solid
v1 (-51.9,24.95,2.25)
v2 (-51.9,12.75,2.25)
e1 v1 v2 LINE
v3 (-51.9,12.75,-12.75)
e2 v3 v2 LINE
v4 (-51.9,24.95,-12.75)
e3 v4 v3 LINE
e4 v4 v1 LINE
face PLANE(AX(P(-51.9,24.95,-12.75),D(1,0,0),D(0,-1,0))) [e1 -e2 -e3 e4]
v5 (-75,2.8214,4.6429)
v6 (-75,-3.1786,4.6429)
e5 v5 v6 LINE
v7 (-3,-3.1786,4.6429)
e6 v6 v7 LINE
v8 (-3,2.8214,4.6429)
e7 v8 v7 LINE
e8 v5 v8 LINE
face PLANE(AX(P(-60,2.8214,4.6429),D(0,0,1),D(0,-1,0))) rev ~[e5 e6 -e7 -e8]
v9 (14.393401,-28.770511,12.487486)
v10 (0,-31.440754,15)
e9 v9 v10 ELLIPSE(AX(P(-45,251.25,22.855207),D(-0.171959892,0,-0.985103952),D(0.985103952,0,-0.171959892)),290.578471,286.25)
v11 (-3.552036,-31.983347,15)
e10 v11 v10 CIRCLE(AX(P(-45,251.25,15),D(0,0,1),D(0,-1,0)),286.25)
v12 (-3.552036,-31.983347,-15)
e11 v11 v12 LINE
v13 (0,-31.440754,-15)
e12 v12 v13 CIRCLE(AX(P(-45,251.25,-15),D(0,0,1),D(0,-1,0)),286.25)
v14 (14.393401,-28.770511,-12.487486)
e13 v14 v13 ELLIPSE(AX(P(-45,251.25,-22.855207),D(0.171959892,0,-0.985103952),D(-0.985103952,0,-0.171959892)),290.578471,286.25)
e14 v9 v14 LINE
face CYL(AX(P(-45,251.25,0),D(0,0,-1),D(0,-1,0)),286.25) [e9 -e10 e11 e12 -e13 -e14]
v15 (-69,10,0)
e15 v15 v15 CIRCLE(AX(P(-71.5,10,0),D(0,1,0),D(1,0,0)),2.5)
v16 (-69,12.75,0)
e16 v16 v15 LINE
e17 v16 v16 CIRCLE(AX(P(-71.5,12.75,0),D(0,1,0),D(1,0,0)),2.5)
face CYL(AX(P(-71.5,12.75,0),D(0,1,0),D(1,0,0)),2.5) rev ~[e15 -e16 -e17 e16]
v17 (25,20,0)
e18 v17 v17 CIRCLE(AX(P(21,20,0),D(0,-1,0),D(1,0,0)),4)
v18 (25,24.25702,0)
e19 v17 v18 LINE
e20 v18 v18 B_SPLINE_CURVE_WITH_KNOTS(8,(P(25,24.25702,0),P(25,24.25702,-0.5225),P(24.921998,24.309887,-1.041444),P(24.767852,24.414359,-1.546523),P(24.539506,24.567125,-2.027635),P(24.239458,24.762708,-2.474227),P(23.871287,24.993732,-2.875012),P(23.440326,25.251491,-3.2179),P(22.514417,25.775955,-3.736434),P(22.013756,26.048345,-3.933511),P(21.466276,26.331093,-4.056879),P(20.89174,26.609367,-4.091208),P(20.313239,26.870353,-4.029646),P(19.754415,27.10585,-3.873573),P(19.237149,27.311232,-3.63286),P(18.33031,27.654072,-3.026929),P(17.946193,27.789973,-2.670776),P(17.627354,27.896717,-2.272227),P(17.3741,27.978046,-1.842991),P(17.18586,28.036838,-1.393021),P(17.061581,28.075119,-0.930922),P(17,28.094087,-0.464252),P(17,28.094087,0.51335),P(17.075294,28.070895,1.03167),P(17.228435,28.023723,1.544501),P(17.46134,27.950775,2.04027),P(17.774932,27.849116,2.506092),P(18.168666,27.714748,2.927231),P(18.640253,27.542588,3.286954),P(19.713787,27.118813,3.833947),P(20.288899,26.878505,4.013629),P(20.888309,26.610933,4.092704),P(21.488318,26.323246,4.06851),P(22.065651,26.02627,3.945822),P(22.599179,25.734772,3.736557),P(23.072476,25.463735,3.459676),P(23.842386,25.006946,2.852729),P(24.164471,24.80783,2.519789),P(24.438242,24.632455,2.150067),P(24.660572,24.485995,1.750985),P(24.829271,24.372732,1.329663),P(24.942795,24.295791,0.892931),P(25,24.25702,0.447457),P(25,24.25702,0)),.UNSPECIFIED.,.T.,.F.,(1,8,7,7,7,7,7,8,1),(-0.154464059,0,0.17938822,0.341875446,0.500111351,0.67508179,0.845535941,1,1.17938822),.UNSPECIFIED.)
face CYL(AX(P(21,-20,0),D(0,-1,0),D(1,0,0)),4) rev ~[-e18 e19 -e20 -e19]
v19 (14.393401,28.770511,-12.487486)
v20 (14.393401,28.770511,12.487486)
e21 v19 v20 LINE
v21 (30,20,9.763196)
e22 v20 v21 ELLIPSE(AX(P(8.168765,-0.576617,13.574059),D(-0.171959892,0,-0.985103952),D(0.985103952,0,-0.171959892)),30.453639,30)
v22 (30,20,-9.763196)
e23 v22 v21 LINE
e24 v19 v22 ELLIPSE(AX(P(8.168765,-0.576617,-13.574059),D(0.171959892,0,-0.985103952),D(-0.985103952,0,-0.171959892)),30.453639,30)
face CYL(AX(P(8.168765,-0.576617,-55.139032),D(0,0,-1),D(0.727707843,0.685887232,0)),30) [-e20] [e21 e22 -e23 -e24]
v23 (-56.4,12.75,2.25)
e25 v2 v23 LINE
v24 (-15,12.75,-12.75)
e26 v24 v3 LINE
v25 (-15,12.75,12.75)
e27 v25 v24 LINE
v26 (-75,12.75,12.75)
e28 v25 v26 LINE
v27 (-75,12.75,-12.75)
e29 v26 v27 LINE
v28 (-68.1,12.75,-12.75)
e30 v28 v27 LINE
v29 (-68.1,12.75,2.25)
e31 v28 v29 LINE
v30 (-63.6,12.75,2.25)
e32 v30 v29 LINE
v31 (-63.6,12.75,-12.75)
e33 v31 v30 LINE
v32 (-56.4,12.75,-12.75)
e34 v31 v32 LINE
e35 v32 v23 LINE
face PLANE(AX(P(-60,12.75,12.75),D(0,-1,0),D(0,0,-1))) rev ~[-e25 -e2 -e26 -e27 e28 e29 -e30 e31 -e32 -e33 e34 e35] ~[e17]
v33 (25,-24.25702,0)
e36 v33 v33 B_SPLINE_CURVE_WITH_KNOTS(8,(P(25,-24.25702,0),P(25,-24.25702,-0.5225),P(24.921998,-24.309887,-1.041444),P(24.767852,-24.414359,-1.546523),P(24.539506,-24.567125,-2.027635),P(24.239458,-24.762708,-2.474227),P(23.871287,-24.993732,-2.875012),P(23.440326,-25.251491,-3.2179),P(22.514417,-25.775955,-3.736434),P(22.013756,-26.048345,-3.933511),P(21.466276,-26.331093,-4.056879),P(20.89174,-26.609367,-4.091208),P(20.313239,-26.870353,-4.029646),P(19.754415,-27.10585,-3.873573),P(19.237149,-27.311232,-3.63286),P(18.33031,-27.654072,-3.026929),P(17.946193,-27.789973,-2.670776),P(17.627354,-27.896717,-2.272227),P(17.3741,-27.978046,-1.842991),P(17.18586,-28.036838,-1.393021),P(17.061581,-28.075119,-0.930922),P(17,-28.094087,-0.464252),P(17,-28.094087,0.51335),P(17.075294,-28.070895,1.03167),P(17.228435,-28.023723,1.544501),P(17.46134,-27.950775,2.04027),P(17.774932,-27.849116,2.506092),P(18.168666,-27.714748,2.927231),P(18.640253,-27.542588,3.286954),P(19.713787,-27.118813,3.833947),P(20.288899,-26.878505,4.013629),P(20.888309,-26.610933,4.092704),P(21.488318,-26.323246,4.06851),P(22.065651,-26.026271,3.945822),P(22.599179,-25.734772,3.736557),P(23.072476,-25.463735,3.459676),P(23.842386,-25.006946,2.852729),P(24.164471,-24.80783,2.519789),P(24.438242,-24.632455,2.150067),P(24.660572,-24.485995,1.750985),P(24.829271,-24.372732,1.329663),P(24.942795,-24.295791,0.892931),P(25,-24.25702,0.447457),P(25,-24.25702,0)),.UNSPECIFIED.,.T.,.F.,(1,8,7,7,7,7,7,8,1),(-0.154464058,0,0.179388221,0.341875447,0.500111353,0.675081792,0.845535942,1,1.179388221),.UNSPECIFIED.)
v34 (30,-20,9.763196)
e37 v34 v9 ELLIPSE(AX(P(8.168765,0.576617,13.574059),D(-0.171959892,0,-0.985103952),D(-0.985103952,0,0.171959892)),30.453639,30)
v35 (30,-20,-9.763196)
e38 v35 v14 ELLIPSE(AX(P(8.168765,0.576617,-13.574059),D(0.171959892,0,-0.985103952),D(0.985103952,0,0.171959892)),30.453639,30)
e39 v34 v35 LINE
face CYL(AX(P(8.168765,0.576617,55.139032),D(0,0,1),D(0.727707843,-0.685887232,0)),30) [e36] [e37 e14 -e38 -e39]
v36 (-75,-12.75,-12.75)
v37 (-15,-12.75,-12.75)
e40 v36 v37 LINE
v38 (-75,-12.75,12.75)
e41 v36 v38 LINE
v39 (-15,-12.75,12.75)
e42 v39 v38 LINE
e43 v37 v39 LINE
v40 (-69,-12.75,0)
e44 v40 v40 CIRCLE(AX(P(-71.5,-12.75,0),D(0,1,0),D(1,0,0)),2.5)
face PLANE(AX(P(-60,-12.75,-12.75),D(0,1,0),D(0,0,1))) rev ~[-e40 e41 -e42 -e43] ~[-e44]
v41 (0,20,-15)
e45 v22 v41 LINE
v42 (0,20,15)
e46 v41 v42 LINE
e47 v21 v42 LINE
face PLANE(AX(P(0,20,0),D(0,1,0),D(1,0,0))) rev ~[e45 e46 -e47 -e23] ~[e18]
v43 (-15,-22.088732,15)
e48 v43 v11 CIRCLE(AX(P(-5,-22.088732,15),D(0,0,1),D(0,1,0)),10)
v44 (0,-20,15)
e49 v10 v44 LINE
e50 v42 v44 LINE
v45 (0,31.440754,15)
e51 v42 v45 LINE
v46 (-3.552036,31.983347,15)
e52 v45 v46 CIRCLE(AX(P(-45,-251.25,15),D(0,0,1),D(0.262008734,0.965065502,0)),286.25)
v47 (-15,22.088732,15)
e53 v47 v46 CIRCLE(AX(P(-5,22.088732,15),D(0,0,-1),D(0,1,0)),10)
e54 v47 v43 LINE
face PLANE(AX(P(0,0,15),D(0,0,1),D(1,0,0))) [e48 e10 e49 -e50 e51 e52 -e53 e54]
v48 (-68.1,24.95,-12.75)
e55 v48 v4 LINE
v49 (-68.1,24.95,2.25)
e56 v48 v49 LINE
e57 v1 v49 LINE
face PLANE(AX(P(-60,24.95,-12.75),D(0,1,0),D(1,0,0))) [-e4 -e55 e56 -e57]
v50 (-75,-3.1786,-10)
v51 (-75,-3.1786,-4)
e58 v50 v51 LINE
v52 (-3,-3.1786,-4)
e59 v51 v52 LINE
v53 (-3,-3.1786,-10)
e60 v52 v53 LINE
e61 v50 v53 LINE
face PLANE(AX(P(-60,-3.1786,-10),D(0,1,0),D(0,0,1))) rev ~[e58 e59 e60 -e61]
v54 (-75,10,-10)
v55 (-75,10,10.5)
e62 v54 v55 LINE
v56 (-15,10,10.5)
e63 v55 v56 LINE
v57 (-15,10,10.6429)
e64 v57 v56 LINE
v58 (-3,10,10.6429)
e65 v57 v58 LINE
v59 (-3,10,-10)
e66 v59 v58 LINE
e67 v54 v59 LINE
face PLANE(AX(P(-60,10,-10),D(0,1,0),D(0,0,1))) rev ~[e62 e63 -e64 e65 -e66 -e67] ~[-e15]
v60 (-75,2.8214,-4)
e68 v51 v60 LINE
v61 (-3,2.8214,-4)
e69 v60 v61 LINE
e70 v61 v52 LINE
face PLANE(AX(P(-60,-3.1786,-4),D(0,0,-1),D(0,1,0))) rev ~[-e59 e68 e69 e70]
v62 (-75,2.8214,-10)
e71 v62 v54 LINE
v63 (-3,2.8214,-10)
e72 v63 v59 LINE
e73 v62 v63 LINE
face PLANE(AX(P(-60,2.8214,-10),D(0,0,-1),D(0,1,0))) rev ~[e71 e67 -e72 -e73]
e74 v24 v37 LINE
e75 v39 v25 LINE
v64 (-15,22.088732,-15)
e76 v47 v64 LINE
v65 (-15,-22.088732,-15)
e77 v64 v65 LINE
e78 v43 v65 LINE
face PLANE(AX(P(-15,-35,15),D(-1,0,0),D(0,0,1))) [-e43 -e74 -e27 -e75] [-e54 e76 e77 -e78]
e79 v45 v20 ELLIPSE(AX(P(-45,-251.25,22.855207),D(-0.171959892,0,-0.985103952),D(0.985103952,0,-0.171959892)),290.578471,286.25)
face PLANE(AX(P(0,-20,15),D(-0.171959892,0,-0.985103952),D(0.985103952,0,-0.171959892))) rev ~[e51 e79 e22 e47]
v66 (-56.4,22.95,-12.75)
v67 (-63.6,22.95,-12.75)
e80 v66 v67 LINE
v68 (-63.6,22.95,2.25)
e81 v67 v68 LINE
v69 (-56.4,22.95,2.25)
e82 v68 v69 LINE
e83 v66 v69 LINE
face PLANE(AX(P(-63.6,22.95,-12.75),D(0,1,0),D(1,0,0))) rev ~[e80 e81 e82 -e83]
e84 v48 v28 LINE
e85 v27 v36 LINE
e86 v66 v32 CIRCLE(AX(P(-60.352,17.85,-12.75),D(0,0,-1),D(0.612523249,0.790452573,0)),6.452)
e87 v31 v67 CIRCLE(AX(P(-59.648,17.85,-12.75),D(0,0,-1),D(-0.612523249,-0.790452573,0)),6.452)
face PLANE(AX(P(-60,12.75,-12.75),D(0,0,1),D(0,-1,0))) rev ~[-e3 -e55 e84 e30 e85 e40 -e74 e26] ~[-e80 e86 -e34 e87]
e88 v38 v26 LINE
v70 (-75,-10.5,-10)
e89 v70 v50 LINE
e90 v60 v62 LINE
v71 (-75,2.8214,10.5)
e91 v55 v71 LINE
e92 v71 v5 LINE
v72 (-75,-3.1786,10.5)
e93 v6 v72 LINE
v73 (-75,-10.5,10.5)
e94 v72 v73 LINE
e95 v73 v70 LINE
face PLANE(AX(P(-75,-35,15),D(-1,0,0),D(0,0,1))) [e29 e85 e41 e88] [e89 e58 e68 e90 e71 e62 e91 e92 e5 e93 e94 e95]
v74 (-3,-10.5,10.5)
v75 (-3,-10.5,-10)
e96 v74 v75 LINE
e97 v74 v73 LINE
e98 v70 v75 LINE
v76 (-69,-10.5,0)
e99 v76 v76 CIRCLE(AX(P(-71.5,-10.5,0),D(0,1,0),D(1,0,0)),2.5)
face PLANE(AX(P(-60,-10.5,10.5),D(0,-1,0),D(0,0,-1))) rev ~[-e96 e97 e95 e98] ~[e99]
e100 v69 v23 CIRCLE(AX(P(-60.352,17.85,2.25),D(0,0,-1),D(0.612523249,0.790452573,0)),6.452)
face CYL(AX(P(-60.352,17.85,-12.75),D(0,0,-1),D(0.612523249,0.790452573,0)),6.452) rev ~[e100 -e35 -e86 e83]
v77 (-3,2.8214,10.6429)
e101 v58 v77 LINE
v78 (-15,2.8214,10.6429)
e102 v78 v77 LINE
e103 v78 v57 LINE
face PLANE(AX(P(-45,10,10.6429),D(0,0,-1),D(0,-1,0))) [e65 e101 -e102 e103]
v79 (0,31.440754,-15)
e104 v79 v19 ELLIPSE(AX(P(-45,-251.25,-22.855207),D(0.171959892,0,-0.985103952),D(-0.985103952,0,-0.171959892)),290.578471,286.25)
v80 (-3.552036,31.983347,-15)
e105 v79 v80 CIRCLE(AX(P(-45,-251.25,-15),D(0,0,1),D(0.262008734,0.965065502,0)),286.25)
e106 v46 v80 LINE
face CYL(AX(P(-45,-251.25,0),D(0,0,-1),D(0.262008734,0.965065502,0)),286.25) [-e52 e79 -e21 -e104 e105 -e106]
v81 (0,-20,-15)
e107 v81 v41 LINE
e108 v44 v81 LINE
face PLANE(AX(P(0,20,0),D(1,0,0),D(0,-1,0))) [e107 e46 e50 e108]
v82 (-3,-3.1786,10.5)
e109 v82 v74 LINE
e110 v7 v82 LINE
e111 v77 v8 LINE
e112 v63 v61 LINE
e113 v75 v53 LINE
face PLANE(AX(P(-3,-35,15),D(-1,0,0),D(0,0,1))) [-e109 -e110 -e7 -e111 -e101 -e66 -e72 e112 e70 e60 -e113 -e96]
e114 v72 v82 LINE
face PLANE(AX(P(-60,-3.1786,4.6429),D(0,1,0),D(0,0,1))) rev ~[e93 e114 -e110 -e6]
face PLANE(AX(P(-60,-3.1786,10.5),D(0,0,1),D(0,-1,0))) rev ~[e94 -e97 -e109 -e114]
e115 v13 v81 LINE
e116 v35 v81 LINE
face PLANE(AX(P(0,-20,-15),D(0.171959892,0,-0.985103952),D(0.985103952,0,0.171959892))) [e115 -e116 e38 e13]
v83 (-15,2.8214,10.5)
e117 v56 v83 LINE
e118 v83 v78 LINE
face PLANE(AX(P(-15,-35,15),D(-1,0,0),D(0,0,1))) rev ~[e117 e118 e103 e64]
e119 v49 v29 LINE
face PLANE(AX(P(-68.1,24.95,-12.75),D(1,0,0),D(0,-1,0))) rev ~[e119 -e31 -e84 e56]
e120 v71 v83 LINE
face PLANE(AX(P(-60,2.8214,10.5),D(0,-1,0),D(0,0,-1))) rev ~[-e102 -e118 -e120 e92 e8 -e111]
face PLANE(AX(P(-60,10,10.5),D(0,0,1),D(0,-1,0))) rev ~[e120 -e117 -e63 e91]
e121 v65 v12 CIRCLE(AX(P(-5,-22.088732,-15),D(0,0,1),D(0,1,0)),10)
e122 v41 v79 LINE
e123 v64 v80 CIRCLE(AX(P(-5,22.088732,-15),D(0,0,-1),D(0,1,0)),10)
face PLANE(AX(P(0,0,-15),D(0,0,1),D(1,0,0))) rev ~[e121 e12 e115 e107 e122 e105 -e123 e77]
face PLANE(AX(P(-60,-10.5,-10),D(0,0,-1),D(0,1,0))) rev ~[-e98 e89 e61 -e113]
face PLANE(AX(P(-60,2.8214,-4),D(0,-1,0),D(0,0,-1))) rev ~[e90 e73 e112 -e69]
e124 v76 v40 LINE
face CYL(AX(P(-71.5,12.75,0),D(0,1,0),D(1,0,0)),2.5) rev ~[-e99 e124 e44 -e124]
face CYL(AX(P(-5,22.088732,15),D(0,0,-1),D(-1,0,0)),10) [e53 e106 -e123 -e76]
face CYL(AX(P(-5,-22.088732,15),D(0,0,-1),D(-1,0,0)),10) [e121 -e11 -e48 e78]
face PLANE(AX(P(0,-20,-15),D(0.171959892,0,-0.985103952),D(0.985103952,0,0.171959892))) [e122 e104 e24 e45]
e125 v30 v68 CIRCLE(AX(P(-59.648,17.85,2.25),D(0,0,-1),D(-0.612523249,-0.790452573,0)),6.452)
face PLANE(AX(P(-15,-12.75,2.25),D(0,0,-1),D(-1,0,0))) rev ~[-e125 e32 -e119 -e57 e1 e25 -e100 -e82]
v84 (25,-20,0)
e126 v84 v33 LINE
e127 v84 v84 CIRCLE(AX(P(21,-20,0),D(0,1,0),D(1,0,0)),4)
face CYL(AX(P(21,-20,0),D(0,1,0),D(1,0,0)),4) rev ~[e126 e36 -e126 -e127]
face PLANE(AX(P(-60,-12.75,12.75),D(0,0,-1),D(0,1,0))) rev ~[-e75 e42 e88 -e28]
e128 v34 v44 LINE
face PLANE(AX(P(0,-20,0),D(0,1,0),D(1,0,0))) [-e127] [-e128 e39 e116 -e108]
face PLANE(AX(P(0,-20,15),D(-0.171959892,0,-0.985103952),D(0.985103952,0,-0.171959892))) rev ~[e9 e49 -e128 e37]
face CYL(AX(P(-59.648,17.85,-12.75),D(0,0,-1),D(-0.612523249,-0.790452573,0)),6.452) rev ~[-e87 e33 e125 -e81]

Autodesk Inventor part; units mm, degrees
ref_plane "YZ Plane" through (0, 0, 0) normal (1, 0, 0) x (0, 1, 0)
ref_plane "XZ Plane" through (0, 0, 0) normal (0, 1, 0) x (-1, 0, 0)
ref_plane "XY Plane" through (0, 0, 0) normal (0, 0, 1) x (1, 0, 0)
sketch "Sketch1" plane through (0, 0, 0) normal (0, 0, 1) x (1, 0, 0)
  line L0 (0, 20) -> (30, 20)
  line L1 (0, 20) -> (0, 0)
  line L2 (-45, 20) -> (-45, 35)
  arc A0 (30, 25) -> (-45, 35) centre (-45, -251.25) ccw
  line L3 (-45, 20) -> (-45, 0)
  line L4 (0, -20) -> (30, -20)
  line L5 (45, -20) -> (45, -20.4834)
  line L6 (0, -20) -> (0, 0)
  line L7 (-45, -20) -> (-45, -35)
  arc A1 (-45, -35) -> (30, -25) centre (-45, 251.25) ccw
  line L8 (-45, -20) -> (-45, 0)
  line L9 (30, 25) -> (30, 20)
  line L10 (30, -25) -> (30, -20)
  point P0 (45, 20.4834)
  point P1 (45, 22.5)
  point P2 (30, 37.5)
  point P3 (-25, -20)
  point P4 (0, -32.987)
  point P5 (45, -22.5)
  point P6 (30, -37.5)
  point P7 (45, -22.5)
  point P8 (30, -37.5)
  dimension "d17" = 15
extrude "Extrusion1" add sketch "Sketch1" along normal mid plane 30
sketch "Sketch3" plane through (0, -20, 15) normal (0, 1, 0) x (1, 0, 0)
  line L0 (0, 0) -> (0, 30) projected
  line L1 (30, 0) -> (0, 0) projected
  line L2 (0, 30) -> (30, 30) projected
  circle A0 centre (36.5, 15) radius 2
  line L3 (30, 30) -> (30, 0) projected
  point P0 (0, 15)
  dimension "d18" = 4
extrude "Extrusion3" cut sketch "Sketch3" along normal through all both and the other way through all contours A0
fillet "Fillet3" radius 30 1 edges at (30, 25, 0)
fillet "Fillet4" radius 30 1 edges at (30, -25, 0)
sketch "Sketch6" plane through (-45, -35, 15) normal (-1, 0, 0) x (0, 0, 1)
  line L0 (-24.0585, 25.4415) -> (-25, 24.5) construction
  line L1 (-4.3571, 37.8214) -> (-10.3571, 37.8214)
  line L2 (-10.3571, 37.8214) -> (-10.3571, 31.8214)
  line L3 (-10.3571, 31.8214) -> (-4.5, 31.8214)
  line L4 (-25, 37.8214) -> (-19, 37.8214)
  line L5 (-19, 37.8214) -> (-19, 31.8214)
  line L6 (-19, 31.8214) -> (-25, 31.8214)
  line L7 (-25, 24.5) -> (-25, 31.8214)
  line L8 (-25, 37.8214) -> (-25, 45)
  line L9 (-4.3571, 45) -> (-4.3571, 37.8214)
  line L10 (-4.5, 31.8214) -> (-4.5, 24.5)
  line L11 (-11.6786, 45) -> (-11.6786, 39)
  line L12 (-11.6786, 39) -> (-17.6786, 39)
  line L13 (-17.6786, 39) -> (-17.6786, 45)
  line L14 (-25, 45) -> (-17.6786, 45)
  line L15 (-11.6786, 45) -> (-4.3571, 45)
  line L16 (-17.6786, 24.5) -> (-17.6786, 30.5)
  line L17 (-17.6786, 30.5) -> (-11.6786, 30.5)
  line L18 (-11.6786, 30.5) -> (-11.6786, 24.5)
  line L19 (-4.5, 24.5) -> (-11.6786, 24.5)
  line L20 (-17.6786, 24.5) -> (-25, 24.5)
  dimension "d59" = 20.5
  dimension "d67" = 6
  dimension "d68" = 6
  dimension "d69" = 6
  dimension "d70" = 6
  dimension "d71" = 6
  dimension "d73" = 6
extrude "Extrusion5" cut sketch "Sketch6" against normal blind 42
sketch "Sketch7" plane through (-45, -35, 15) normal (-1, 0, 0) x (0, 0, 1)
  line L0 (-30, 50) -> (0, 50)
  line L1 (0, 50) -> (0, 20)
  line L2 (0, 20) -> (-30, 20)
  line L3 (-30, 20) -> (-30, 50)
  line L4 (-30, 50) -> (0, 20) construction
  line L5 (0, 50) -> (-30, 20) construction
  line L6 (-22.5355, 32.4645) -> (-22.5355, 28.5251) projected
  line L7 (-24.5355, 32.4645) -> (-22.5355, 32.4645) projected
  line L8 (-24.5355, 25.4645) -> (-24.5355, 32.4645) projected
  line L9 (-17.5355, 25.4645) -> (-24.5355, 25.4645) projected
  line L10 (-17.5355, 27.4645) -> (-17.5355, 25.4645) projected
  line L11 (-21.4749, 27.4645) -> (-17.5355, 27.4645) projected
  line L12 (-17.9393, 31) -> (-21.4749, 27.4645) projected
  line L13 (-12.0607, 31) -> (-17.9393, 31) projected
  line L14 (-8.5251, 27.4645) -> (-12.0607, 31) projected
  line L15 (-12.4645, 27.4645) -> (-8.5251, 27.4645) projected
  line L16 (-12.4645, 25.4645) -> (-12.4645, 27.4645) projected
  line L17 (-5.4645, 25.4645) -> (-12.4645, 25.4645) projected
  line L18 (-5.4645, 32.4645) -> (-5.4645, 25.4645) projected
  line L19 (-7.4645, 32.4645) -> (-5.4645, 32.4645) projected
  line L20 (-7.4645, 28.5251) -> (-7.4645, 32.4645) projected
  line L21 (-11, 32.0607) -> (-7.4645, 28.5251) projected
  line L22 (-11, 37.9393) -> (-11, 32.0607) projected
  line L23 (-7.4645, 41.4749) -> (-11, 37.9393) projected
  line L24 (-7.4645, 37.5355) -> (-7.4645, 41.4749) projected
  line L25 (-5.4645, 37.5355) -> (-7.4645, 37.5355) projected
  line L26 (-5.4645, 44.5355) -> (-5.4645, 37.5355) projected
  line L27 (-12.4645, 44.5355) -> (-5.4645, 44.5355) projected
  line L28 (-12.4645, 42.5355) -> (-12.4645, 44.5355) projected
  line L29 (-8.5251, 42.5355) -> (-12.4645, 42.5355) projected
  line L30 (-12.0607, 39) -> (-8.5251, 42.5355) projected
  line L31 (-17.9393, 39) -> (-12.0607, 39) projected
  line L32 (-21.4749, 42.5355) -> (-17.9393, 39) projected
  line L33 (-17.5355, 42.5355) -> (-21.4749, 42.5355) projected
  line L34 (-17.5355, 44.5355) -> (-17.5355, 42.5355) projected
  line L35 (-24.5355, 44.5355) -> (-17.5355, 44.5355) projected
  line L36 (-24.5355, 37.5355) -> (-24.5355, 44.5355) projected
  line L37 (-22.5355, 37.5355) -> (-24.5355, 37.5355) projected
  line L38 (-22.5355, 41.4749) -> (-22.5355, 37.5355) projected
  line L39 (-19, 37.9393) -> (-22.5355, 41.4749) projected
  line L40 (-19, 32.0607) -> (-19, 37.9393) projected
  line L41 (-22.5355, 28.5251) -> (-19, 32.0607) projected
  line L42 (-30, 70) -> (0, 70) projected
  line L43 (-30, 0) -> (-30, 70) projected
  line L44 (0, 70) -> (0, 0) projected
  line L45 (-30, 0) -> (0, 0) projected
  point P0 (-15, 35)
  dimension "d47" = 30
  dimension "d48" = 30
extrude "Extrusion6" cut sketch "Sketch7" against normal blind 30 contours L43 L42 L44 L0 | L0 L1 L2 L3 | L2 L44 L45 L43 | L6 L41 L40 L39 L38 L37 L36 L35 L34 L33 L32 L31 L30 L29 L28 L27 L26 L25 L24 L23 L22 L21 L20 L19 L18 L17 L16 L15 L14 L13 L12 L11 L10 L9 L8 L7
fillet "Fillet5" radius 10 1 edges at (-15, 33.4236, 0)
fillet "Fillet6" radius 10 1 edges at (-15, -33.4236, 0)
sketch "Sketch8" plane through (0, -20, 15) normal (0, 1, 0) x (1, 0, 0)
  line L0 (0, 0) -> (0, 30) projected
  line L1 (30, 0) -> (0, 0) projected
  line L2 (0, 30) -> (30, 30) projected
  circle A0 centre (36.5, 15) radius 2 projected
  arc A1 (37.9617, 6.6266) -> (37.9617, 23.3734) centre (36.5, 15) ccw
  line L3 (0, 0) -> (37.9617, 6.6266)
  line L4 (0, 30) -> (37.9617, 23.3734)
  line L5 (-15, 0) -> (-15, 30) projected
  line L6 (0, 0) -> (-15, 0)
  line L7 (-15, 0) -> (-15, 30)
  line L8 (-15, 0) -> (-15, 30)
  line L9 (0, 12.4645) -> (0, 5.4645) projected
  line L10 (-15, 30) -> (0, 30)
  line L11 (-3.552, 30) -> (-3.552, 0) projected
  line L12 (30, 30) -> (30, 0) projected
  point P0 (0, 15)
extrude "Extrusion7" cut sketch "Sketch8" along normal through all both and the other way through all contours L6 L11 L10 L0 | L0 L4 L12 L3 | L12 L4 A1 L3 | L6 L5 L10 L11 | A0 keep common part
sketch "Sketch9" plane through (0, -20, 15) normal (0, 1, 0) x (1, 0, 0)
  circle A0 centre (21, 15) radius 4
  line L0 (30, 24.7632) -> (30, 5.2368) projected
  point P0 (0, 15)
  point P1 (30, 15)
  dimension "d55" = 8
  dimension "d56" = 9
extrude "Extrusion8" cut sketch "Sketch9" along normal through all both and the other way through all
sketch "Sketch10" plane through (-15, -35, 15) normal (-1, 0, 0) x (0, 0, 1)
  point P0 (-15, 35)
sketch "Sketch11" plane through (-15, -35, 15) normal (-1, 0, 0) x (0, 0, 1)
  line L0 (-25, 45) -> (-17.6786, 45) projected
  line L1 (-4.5, 24.5) -> (-11.6786, 24.5) projected
  line L2 (-27.75, 22.25) -> (-2.25, 22.25)
  line L3 (-2.25, 22.25) -> (-2.25, 47.75)
  line L4 (-2.25, 47.75) -> (-27.75, 47.75)
  line L5 (-27.75, 47.75) -> (-27.75, 22.25)
  line L6 (-17.6786, 45) -> (-17.6786, 39) projected
  line L7 (-17.6786, 45) -> (-17.6786, 39)
  line L8 (-17.6786, 39) -> (-11.6786, 39) projected
  line L9 (-17.6786, 39) -> (-11.6786, 39)
  line L10 (-11.6786, 39) -> (-11.6786, 45) projected
  line L11 (-11.6786, 39) -> (-11.6786, 45)
  line L12 (-10.3571, 37.8214) -> (-4.3571, 37.8214) projected
  line L13 (-4.3571, 37.8214) -> (-10.3571, 37.8214)
  line L14 (-10.3571, 37.8214) -> (-10.3571, 31.8214) projected
  line L15 (-10.3571, 37.8214) -> (-10.3571, 31.8214)
  line L16 (-4.5, 31.8214) -> (-10.3571, 31.8214) projected
  line L17 (-10.3571, 31.8214) -> (-4.5, 31.8214)
  line L18 (-11.6786, 30.5) -> (-11.6786, 24.5) projected
  line L19 (-11.6786, 24.5) -> (-11.6786, 30.5)
  line L20 (-17.6786, 30.5) -> (-11.6786, 30.5) projected
  line L21 (-11.6786, 30.5) -> (-17.6786, 30.5)
  line L22 (-17.6786, 30.5) -> (-17.6786, 24.5) projected
  line L23 (-17.6786, 30.5) -> (-17.6786, 24.5)
  line L24 (-19, 37.8214) -> (-25, 37.8214) projected
  line L25 (-25, 37.8214) -> (-19, 37.8214)
  line L26 (-25, 31.8214) -> (-19, 31.8214) projected
  line L27 (-19, 37.8214) -> (-19, 31.8214)
  line L28 (-19, 31.8214) -> (-25, 31.8214)
  line L29 (-25, 45) -> (-17.6786, 45)
  line L30 (-11.6786, 45) -> (-4.5, 45)
  line L31 (-25, 24.5) -> (-25, 31.8214)
  line L32 (-25, 37.8214) -> (-25, 45)
  line L33 (-4.5, 24.5) -> (-11.6786, 24.5)
  line L34 (-17.6786, 24.5) -> (-25, 24.5)
  line L35 (-4.5, 45) -> (-4.5, 37.8214)
  line L36 (-4.5, 31.8214) -> (-4.5, 24.5)
  point P0 (-15, 35)
extrude "Extrusion9" add sketch "Sketch11" along normal blind 45
sketch "Sketch12" plane through (-60, -35, 15) normal (-1, 0, 0) x (0, 0, 1)
  line L0 (-17.6786, 45) -> (-17.6786, 39) projected
  line L1 (-17.6786, 45) -> (-17.6786, 39)
  line L2 (-17.6786, 39) -> (-11.6786, 39) projected
  line L3 (-17.6786, 39) -> (-11.6786, 39)
  line L4 (-11.6786, 39) -> (-11.6786, 45) projected
  line L5 (-11.6786, 39) -> (-11.6786, 45)
  line L6 (-11.6786, 45) -> (-17.6786, 45)
  line L7 (-11.6786, 30.5) -> (-17.6786, 30.5) projected
  line L8 (-17.6786, 30.5) -> (-11.6786, 30.5)
  line L9 (-11.6786, 24.5) -> (-11.6786, 30.5) projected
  line L10 (-11.6786, 30.5) -> (-11.6786, 24.5)
  line L11 (-17.6786, 24.5) -> (-25, 24.5) projected
  line L12 (-11.6786, 24.5) -> (-17.6786, 24.5)
  line L13 (-17.6786, 24.5) -> (-17.6786, 30.5)
  point P0 (-15, 35)
extrude "Extrusion10" cut sketch "Sketch12" against normal up to surface (57 mm away)
sketch "Sketch13" plane through (-15, 12.75, 12.75) normal (0, 1, 0) x (1, 0, 0)
  point P0 (15, 12.75)
sketch "Sketch15" plane through (-15, -12.75, -12.75) normal (0, 0, -1) x (-1, 0, 0)
  line L0 (0, 25.5) -> (45, 25.5) projected
  line L1 (41.4, 35.7) -> (45, 35.7)
  arc A0 (41.4, 35.7) -> (41.4, 25.5) centre (45.352, 30.6) ccw
  line L2 (48.6, 35.7) -> (45, 35.7)
  arc A1 (48.6, 25.5) -> (48.6, 35.7) centre (44.648, 30.6) ccw
  line L3 (0, 25.5) -> (45, 25.5) projected
  line L4 (0, 22.75) -> (45, 22.75) projected
  line L5 (45, 37.7) -> (36.9, 37.7)
  line L6 (36.9, 37.7) -> (36.9, 25.5)
  line L7 (45, 37.7) -> (53.1, 37.7)
  line L8 (53.1, 37.7) -> (53.1, 25.5)
  line L9 (36.9, 25.5) -> (41.4, 25.5)
  line L10 (48.6, 25.5) -> (53.1, 25.5)
  line L11 (45, 0) -> (45, 25.5) projected
  point P0 (-15, 12.75)
  point P1 (38.9, 25.5)
  point P2 (38.9, 35.7)
  point P3 (51.1, 25.5)
  point P4 (51.1, 35.7)
  dimension "d85" = 10.2
extrude "Extrusion12" add sketch "Sketch15" against normal blind 15
sketch "Sketch16" plane through (-60, -35, 15) normal (-1, 0, 0) x (0, 0, 1)
  line L0 (-4.5, 24.5) -> (-25, 24.5) projected
  line L1 (-25, 24.5) -> (-25, 31.8214) projected
  line L2 (-25, 31.8214) -> (-19, 31.8214) projected
  line L3 (-19, 31.8214) -> (-19, 37.8214) projected
  line L4 (-19, 37.8214) -> (-25, 37.8214) projected
  line L5 (-25, 37.8214) -> (-25, 45) projected
  line L6 (-25, 45) -> (-4.5, 45) projected
  line L7 (-4.5, 45) -> (-4.5, 37.8214) projected
  line L8 (-4.5, 37.8214) -> (-10.3571, 37.8214) projected
  line L9 (-10.3571, 37.8214) -> (-10.3571, 31.8214) projected
  line L10 (-10.3571, 31.8214) -> (-4.5, 31.8214) projected
  line L11 (-4.5, 31.8214) -> (-4.5, 24.5) projected
  line L12 (-2.25, 22.25) -> (-2.25, 47.75) projected
  line L13 (-2.25, 47.75) -> (-27.75, 47.75) projected
  line L14 (-27.75, 47.75) -> (-27.75, 22.25) projected
  line L15 (-27.75, 22.25) -> (-2.25, 22.25) projected
  point P0 (-15, 35)
extrude "Extrusion13" add sketch "Sketch16" along normal blind 15
sketch "Sketch17" plane through (-15, 12.75, 12.75) normal (0, 1, 0) x (1, 0, 0)
  circle A0 centre (-56.5, 12.75) radius 2.5
  line L0 (-60, 0) -> (-60, 25.5) projected
  point P0 (15, 12.75)
  dimension "d96" = 5
  dimension "d97" = 3.5
extrude "Extrusion14" cut sketch "Sketch17" against normal through all
properties part number "Nuckle"
